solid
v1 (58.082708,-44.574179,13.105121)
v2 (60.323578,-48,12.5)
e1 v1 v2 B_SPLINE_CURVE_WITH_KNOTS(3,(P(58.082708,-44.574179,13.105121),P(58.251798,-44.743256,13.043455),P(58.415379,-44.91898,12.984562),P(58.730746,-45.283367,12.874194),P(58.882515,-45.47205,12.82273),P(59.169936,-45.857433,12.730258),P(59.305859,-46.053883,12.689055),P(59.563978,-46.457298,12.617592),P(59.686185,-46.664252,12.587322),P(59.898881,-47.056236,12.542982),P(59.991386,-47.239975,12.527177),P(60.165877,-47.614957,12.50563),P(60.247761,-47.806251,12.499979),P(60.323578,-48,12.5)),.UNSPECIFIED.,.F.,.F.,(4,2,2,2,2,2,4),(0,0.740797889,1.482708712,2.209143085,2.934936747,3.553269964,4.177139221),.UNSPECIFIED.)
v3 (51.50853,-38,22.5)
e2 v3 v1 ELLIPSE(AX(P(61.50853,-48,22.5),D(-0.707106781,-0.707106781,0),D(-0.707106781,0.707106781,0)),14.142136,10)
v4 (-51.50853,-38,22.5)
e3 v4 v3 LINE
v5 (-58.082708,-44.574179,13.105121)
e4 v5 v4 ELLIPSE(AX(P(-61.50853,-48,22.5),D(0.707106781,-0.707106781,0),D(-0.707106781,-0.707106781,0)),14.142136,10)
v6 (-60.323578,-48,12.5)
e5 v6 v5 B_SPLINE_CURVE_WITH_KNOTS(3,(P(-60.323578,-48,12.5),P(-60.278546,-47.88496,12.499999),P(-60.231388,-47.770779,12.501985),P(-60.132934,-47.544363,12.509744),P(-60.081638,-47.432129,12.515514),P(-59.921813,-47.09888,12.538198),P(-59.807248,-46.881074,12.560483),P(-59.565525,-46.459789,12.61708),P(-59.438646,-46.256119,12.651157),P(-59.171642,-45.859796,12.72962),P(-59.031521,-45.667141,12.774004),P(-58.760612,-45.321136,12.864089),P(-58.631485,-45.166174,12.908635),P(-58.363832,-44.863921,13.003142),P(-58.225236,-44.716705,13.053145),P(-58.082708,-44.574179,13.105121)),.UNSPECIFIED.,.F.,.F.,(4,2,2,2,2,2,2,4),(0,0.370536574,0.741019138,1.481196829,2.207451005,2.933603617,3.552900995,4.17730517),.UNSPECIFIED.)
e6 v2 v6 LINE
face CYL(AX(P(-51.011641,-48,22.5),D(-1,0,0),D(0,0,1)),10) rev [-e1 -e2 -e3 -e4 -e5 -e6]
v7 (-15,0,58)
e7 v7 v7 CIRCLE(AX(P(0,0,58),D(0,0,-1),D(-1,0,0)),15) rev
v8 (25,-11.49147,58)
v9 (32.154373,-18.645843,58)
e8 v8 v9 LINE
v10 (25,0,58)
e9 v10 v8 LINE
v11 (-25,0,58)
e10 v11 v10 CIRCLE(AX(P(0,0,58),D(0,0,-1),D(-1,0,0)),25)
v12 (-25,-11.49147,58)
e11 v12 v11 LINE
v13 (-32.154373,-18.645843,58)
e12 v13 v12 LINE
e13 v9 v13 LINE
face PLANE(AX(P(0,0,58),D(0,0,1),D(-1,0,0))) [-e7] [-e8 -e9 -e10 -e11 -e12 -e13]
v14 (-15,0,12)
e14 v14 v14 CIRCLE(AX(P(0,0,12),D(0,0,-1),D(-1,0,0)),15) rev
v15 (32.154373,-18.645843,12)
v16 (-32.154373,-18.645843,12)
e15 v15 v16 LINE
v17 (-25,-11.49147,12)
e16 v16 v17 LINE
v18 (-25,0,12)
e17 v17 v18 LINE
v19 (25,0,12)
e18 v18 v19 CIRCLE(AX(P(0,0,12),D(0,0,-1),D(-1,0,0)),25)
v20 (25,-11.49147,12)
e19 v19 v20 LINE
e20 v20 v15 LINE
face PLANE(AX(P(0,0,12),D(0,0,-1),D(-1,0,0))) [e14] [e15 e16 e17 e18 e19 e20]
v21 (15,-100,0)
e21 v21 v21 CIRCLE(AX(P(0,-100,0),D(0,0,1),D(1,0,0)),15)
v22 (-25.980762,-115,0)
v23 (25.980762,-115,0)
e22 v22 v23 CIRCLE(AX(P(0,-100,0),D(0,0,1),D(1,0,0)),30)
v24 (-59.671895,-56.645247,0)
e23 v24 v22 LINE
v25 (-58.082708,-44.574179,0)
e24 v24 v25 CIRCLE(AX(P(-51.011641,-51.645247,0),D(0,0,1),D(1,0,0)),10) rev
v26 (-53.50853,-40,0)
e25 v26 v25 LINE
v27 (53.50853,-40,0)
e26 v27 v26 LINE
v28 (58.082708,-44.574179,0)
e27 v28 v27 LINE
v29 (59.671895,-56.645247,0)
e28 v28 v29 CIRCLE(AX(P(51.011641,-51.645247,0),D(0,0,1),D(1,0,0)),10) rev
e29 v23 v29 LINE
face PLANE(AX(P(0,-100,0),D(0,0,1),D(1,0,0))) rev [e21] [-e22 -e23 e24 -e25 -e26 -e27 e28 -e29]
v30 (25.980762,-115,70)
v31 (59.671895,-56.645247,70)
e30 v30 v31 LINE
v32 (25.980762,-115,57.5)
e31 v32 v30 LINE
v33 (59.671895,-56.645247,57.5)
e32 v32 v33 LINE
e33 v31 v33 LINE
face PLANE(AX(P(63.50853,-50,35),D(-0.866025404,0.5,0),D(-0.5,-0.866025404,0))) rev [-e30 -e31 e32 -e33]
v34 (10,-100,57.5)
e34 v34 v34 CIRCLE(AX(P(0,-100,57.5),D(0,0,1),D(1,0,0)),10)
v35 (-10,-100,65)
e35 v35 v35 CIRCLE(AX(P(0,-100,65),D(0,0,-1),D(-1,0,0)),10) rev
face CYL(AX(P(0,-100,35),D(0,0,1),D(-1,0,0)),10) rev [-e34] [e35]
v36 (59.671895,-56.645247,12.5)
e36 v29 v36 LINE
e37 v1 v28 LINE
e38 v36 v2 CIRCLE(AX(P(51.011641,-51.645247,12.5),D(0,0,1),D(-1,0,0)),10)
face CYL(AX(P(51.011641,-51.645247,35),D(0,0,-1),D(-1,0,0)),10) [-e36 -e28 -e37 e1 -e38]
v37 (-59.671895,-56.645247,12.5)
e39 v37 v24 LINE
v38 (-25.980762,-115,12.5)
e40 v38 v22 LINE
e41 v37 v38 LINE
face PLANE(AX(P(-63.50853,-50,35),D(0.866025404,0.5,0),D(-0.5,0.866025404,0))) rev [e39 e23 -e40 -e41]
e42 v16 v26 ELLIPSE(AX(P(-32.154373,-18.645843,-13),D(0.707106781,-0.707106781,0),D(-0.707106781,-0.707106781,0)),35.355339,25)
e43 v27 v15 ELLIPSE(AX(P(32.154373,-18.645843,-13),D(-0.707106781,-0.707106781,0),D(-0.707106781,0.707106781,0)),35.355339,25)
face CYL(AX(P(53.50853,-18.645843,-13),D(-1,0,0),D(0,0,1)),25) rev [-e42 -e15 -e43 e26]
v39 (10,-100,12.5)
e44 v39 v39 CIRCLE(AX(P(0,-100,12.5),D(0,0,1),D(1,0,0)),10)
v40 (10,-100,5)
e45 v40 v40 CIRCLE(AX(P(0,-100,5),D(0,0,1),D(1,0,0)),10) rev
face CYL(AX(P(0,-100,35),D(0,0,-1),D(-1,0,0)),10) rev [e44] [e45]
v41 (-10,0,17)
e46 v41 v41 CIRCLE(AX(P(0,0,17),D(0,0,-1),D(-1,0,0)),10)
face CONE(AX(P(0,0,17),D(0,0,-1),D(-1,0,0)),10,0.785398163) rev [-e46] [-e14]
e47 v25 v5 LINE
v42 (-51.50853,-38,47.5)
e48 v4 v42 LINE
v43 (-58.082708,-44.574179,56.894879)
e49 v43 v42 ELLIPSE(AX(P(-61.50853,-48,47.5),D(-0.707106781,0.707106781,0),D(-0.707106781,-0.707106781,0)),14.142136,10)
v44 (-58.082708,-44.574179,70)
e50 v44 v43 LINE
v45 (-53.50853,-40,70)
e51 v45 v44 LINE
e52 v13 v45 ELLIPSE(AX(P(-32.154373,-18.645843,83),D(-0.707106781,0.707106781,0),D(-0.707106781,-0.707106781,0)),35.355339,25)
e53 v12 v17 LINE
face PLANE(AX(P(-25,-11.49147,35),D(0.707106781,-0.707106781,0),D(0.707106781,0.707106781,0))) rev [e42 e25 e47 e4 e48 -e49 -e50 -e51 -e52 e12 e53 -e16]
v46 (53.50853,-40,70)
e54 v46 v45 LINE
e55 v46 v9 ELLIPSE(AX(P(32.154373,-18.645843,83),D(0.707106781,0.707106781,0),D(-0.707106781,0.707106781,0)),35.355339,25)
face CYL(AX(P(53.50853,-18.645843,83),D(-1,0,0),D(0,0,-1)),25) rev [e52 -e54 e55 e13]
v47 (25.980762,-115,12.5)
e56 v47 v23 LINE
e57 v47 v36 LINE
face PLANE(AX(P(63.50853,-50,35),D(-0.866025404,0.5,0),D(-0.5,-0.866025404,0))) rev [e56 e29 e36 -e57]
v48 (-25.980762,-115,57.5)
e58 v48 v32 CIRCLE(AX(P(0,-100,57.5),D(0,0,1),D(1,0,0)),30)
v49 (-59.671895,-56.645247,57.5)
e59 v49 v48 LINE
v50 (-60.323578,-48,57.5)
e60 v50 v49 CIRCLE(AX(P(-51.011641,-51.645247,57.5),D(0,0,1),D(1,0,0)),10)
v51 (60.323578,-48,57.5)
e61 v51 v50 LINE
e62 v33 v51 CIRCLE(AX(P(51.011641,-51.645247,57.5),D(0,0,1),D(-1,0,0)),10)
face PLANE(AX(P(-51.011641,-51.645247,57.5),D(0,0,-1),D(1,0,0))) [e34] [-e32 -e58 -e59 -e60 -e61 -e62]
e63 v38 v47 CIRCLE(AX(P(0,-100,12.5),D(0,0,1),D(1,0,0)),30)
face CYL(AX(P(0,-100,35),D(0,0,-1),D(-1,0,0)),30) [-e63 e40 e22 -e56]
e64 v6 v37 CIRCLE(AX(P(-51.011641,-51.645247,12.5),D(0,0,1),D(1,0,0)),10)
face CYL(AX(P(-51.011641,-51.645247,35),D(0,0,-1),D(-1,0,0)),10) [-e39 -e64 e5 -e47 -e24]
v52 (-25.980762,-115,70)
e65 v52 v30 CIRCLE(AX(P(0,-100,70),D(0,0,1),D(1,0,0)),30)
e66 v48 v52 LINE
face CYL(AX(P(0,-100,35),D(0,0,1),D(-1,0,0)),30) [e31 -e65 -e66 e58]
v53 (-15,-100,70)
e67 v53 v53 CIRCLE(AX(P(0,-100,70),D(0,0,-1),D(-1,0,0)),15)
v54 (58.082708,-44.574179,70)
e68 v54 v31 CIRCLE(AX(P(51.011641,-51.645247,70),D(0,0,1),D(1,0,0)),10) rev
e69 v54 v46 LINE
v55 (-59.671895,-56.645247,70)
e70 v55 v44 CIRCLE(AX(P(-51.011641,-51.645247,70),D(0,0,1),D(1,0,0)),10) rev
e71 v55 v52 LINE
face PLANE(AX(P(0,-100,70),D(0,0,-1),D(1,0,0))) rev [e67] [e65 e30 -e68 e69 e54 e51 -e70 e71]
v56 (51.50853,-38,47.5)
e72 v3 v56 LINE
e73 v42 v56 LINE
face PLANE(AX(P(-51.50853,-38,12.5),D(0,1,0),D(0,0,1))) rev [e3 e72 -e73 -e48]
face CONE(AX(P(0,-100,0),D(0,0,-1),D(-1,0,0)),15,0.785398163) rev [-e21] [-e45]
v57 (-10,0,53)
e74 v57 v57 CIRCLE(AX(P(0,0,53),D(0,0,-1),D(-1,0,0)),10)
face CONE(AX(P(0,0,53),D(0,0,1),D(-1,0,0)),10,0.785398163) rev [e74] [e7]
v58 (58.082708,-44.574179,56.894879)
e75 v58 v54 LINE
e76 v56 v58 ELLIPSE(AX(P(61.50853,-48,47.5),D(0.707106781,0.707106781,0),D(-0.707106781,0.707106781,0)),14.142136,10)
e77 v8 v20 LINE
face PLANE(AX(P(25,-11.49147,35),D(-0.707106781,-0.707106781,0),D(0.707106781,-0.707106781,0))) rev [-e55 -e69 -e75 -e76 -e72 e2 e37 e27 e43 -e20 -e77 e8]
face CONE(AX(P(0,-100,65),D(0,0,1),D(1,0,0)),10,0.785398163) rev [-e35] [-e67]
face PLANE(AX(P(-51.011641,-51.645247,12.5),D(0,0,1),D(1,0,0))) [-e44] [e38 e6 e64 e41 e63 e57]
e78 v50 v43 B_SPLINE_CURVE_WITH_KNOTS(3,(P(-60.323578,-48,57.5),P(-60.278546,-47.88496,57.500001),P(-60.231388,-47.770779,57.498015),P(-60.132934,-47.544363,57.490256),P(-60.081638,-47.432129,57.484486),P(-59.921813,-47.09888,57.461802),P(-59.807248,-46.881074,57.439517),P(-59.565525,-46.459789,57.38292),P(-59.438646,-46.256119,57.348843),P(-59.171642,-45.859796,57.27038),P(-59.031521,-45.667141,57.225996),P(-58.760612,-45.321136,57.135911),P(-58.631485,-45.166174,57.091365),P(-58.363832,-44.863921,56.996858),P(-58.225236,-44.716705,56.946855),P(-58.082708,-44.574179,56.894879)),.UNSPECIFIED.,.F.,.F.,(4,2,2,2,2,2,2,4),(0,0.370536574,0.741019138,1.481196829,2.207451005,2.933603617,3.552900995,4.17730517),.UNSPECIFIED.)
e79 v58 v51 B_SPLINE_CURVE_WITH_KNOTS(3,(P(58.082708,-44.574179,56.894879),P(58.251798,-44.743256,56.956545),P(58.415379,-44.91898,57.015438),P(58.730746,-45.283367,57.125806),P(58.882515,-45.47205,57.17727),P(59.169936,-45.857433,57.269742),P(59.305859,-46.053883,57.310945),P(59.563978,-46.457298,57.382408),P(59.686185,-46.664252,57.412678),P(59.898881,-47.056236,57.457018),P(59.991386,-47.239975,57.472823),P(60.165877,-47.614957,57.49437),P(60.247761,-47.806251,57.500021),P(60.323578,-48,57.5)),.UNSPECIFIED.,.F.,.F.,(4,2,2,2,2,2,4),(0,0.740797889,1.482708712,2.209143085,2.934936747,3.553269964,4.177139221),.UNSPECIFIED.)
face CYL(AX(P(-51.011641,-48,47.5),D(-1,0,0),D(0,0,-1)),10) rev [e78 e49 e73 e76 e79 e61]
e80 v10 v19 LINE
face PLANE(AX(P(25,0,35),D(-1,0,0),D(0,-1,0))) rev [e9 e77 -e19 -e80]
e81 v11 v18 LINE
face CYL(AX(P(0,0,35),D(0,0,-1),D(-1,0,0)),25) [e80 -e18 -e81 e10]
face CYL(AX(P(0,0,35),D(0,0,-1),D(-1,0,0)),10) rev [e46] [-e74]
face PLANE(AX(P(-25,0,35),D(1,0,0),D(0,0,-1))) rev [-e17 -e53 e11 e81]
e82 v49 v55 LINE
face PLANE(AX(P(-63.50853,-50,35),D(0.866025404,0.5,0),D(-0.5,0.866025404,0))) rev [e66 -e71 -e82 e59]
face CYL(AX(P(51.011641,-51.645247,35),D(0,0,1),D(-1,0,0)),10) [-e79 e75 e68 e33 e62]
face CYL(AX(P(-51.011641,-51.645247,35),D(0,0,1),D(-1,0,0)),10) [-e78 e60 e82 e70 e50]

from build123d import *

# Parameters (mm, degrees)
SKETCH3_R           = 10
BOSS_EXTRUDE4_DEPTH = 35
FILLET3_R           = 10
CUT_EXTRUDE1_DEPTH  = 12
CUT_EXTRUDE2_DEPTH  = 22.5
FILLET4_R           = 25
FILLET5_R           = 10
CHAMFER2_SIZE       = 5
CHAMFER4_SIZE       = 5


with BuildPart() as part:
    # Sketch3 → Boss-Extrude4 (new body)
    with BuildSketch(Plane.XY):
        with BuildLine():
            Line((-25, 0), (-25, -11.491470389))
            Line((-25, -11.491470389), (-63.508529611, -50))
            Line((-63.508529611, -50), (-25.980762114, -115))
            ThreePointArc((-25.980762114, -115), (0, -130), (25.980762114, -115))
            Line((25.980762114, -115), (63.508529611, -50))
            Line((63.508529611, -50), (25, -11.491470389))
            Line((25, -11.491470389), (25, 0))
            ThreePointArc((25, 0), (0, 25), (-25, 0))
        make_face()
        Circle(SKETCH3_R, mode=Mode.SUBTRACT)
        with Locations((0, -100)):
            Circle(SKETCH3_R, mode=Mode.SUBTRACT)
    extrude(amount=BOSS_EXTRUDE4_DEPTH)

    # Fillet3
    fillet3_edges = [part.edges().sort_by_distance(p)[0] for p in [
        (-63.508529611, -50, 17.5),
        (63.508529611, -50, 17.5),
    ]]
    fillet(fillet3_edges, radius=FILLET3_R)

    # Sketch5 → Cut-Extrude1 (cut)
    with BuildSketch(Plane(origin=(0, 0, 0), x_dir=(-1, 0, 0), z_dir=(0, 0, -1))):
        with BuildLine():
            Line((-53.508529611, -40), (53.508529611, -40))
            Line((53.508529611, -40), (25, -11.491470389))
            Line((25, -11.491470389), (25, 0))
            ThreePointArc((25, 0), (0, 25), (-25, 0))
            Line((-25, 0), (-25, -11.491470389))
            Line((-25, -11.491470389), (-53.508529611, -40))
        make_face()
    extrude(amount=-CUT_EXTRUDE1_DEPTH, mode=Mode.SUBTRACT)

    # Sketch6 → Cut-Extrude2 (cut)
    with BuildSketch(Plane.XY.offset(35)):
        with BuildLine():
            Line((-51.508529611, -38), (51.508529611, -38))
            Line((51.508529611, -38), (58.082708445, -44.574178834))
            ThreePointArc((58.082708445, -44.574178834), (60.926089247, -50.339984724), (59.671894671, -56.645246646))
            Line((59.671894671, -56.645246646), (25.980762114, -115))
            ThreePointArc((25.980762114, -115), (0, -130), (-25.980762114, -115))
            Line((-25.980762114, -115), (-59.671894671, -56.645246646))
            ThreePointArc((-59.671894671, -56.645246646), (-60.926089247, -50.339984724), (-58.082708445, -44.574178834))
            Line((-58.082708445, -44.574178834), (-51.508529611, -38))
        make_face()
    extrude(amount=-CUT_EXTRUDE2_DEPTH, mode=Mode.SUBTRACT)

    # Fillet4
    # the kernel refuses this fillet: 25 mm, written as the material it adds along each edge
    with BuildSketch(Plane(origin=(106.893920871, -40, 12), x_dir=(0, 1, 0), z_dir=(-1, 0, 0))) as fillet4_piece_1_section:
        with BuildLine():
            CenterArc((21.354156504, 25), FILLET4_R, 211.332251498, 58.667748502)
            Line((0, 12), (-0.42708313, 11.74))
            ThreePointArc((-0.42708313, 11.74), (-0.5, 6), (-0.5, 0))
            Line((-0.5, 0), (0, -0.5))
            Line((0, -0.5), (21.354156504, -0.5))
            Line((21.354156504, -0.5), (21.354156504, 0))
        make_face()
    fillet4_piece_1 = extrude(amount=213.787841742, mode=Mode.PRIVATE)
    fillet4_piece_1 = split(fillet4_piece_1, bisect_by=Plane(origin=(-24.314247143, -10.805717532, 8.724953467), z_dir=(0.7071067811865464, -0.7071067811865487, 0)), keep=Keep.TOP, mode=Mode.PRIVATE)
    fillet4_piece_1 = split(fillet4_piece_1, bisect_by=Plane(origin=(24.314247143, -10.805717532, 8.724953467), z_dir=(-0.7071067811865461, -0.7071067811865489, 0)), keep=Keep.TOP, mode=Mode.PRIVATE)
    add(fillet4_piece_1)

    # Fillet5
    fillet5_edges = [part.edges().sort_by_distance(p)[0] for p in [
        (0, -38, 12.5),
    ]]
    fillet(fillet5_edges, radius=FILLET5_R)

    # Chamfer2
    chamfer2_edges = [part.edges().sort_by_distance(p)[0] for p in [
        (-10, 0, 12),
    ]]
    chamfer(chamfer2_edges, length=CHAMFER2_SIZE)

    # Mirror2: part across plane


with BuildPart() as part_1:
    add(part.part)
    add(part.part.mirror(Plane(origin=(0, -100, 35), x_dir=(1, 0, 0), z_dir=(0, 0, 1))))

    # Chamfer4
    chamfer4_edges = [part_1.edges().sort_by_distance(p)[0] for p in [
        (-10, -100, 70),
        (-10, -100, 0),
    ]]
    chamfer(chamfer4_edges, length=CHAMFER4_SIZE)


solid = part_1.part
